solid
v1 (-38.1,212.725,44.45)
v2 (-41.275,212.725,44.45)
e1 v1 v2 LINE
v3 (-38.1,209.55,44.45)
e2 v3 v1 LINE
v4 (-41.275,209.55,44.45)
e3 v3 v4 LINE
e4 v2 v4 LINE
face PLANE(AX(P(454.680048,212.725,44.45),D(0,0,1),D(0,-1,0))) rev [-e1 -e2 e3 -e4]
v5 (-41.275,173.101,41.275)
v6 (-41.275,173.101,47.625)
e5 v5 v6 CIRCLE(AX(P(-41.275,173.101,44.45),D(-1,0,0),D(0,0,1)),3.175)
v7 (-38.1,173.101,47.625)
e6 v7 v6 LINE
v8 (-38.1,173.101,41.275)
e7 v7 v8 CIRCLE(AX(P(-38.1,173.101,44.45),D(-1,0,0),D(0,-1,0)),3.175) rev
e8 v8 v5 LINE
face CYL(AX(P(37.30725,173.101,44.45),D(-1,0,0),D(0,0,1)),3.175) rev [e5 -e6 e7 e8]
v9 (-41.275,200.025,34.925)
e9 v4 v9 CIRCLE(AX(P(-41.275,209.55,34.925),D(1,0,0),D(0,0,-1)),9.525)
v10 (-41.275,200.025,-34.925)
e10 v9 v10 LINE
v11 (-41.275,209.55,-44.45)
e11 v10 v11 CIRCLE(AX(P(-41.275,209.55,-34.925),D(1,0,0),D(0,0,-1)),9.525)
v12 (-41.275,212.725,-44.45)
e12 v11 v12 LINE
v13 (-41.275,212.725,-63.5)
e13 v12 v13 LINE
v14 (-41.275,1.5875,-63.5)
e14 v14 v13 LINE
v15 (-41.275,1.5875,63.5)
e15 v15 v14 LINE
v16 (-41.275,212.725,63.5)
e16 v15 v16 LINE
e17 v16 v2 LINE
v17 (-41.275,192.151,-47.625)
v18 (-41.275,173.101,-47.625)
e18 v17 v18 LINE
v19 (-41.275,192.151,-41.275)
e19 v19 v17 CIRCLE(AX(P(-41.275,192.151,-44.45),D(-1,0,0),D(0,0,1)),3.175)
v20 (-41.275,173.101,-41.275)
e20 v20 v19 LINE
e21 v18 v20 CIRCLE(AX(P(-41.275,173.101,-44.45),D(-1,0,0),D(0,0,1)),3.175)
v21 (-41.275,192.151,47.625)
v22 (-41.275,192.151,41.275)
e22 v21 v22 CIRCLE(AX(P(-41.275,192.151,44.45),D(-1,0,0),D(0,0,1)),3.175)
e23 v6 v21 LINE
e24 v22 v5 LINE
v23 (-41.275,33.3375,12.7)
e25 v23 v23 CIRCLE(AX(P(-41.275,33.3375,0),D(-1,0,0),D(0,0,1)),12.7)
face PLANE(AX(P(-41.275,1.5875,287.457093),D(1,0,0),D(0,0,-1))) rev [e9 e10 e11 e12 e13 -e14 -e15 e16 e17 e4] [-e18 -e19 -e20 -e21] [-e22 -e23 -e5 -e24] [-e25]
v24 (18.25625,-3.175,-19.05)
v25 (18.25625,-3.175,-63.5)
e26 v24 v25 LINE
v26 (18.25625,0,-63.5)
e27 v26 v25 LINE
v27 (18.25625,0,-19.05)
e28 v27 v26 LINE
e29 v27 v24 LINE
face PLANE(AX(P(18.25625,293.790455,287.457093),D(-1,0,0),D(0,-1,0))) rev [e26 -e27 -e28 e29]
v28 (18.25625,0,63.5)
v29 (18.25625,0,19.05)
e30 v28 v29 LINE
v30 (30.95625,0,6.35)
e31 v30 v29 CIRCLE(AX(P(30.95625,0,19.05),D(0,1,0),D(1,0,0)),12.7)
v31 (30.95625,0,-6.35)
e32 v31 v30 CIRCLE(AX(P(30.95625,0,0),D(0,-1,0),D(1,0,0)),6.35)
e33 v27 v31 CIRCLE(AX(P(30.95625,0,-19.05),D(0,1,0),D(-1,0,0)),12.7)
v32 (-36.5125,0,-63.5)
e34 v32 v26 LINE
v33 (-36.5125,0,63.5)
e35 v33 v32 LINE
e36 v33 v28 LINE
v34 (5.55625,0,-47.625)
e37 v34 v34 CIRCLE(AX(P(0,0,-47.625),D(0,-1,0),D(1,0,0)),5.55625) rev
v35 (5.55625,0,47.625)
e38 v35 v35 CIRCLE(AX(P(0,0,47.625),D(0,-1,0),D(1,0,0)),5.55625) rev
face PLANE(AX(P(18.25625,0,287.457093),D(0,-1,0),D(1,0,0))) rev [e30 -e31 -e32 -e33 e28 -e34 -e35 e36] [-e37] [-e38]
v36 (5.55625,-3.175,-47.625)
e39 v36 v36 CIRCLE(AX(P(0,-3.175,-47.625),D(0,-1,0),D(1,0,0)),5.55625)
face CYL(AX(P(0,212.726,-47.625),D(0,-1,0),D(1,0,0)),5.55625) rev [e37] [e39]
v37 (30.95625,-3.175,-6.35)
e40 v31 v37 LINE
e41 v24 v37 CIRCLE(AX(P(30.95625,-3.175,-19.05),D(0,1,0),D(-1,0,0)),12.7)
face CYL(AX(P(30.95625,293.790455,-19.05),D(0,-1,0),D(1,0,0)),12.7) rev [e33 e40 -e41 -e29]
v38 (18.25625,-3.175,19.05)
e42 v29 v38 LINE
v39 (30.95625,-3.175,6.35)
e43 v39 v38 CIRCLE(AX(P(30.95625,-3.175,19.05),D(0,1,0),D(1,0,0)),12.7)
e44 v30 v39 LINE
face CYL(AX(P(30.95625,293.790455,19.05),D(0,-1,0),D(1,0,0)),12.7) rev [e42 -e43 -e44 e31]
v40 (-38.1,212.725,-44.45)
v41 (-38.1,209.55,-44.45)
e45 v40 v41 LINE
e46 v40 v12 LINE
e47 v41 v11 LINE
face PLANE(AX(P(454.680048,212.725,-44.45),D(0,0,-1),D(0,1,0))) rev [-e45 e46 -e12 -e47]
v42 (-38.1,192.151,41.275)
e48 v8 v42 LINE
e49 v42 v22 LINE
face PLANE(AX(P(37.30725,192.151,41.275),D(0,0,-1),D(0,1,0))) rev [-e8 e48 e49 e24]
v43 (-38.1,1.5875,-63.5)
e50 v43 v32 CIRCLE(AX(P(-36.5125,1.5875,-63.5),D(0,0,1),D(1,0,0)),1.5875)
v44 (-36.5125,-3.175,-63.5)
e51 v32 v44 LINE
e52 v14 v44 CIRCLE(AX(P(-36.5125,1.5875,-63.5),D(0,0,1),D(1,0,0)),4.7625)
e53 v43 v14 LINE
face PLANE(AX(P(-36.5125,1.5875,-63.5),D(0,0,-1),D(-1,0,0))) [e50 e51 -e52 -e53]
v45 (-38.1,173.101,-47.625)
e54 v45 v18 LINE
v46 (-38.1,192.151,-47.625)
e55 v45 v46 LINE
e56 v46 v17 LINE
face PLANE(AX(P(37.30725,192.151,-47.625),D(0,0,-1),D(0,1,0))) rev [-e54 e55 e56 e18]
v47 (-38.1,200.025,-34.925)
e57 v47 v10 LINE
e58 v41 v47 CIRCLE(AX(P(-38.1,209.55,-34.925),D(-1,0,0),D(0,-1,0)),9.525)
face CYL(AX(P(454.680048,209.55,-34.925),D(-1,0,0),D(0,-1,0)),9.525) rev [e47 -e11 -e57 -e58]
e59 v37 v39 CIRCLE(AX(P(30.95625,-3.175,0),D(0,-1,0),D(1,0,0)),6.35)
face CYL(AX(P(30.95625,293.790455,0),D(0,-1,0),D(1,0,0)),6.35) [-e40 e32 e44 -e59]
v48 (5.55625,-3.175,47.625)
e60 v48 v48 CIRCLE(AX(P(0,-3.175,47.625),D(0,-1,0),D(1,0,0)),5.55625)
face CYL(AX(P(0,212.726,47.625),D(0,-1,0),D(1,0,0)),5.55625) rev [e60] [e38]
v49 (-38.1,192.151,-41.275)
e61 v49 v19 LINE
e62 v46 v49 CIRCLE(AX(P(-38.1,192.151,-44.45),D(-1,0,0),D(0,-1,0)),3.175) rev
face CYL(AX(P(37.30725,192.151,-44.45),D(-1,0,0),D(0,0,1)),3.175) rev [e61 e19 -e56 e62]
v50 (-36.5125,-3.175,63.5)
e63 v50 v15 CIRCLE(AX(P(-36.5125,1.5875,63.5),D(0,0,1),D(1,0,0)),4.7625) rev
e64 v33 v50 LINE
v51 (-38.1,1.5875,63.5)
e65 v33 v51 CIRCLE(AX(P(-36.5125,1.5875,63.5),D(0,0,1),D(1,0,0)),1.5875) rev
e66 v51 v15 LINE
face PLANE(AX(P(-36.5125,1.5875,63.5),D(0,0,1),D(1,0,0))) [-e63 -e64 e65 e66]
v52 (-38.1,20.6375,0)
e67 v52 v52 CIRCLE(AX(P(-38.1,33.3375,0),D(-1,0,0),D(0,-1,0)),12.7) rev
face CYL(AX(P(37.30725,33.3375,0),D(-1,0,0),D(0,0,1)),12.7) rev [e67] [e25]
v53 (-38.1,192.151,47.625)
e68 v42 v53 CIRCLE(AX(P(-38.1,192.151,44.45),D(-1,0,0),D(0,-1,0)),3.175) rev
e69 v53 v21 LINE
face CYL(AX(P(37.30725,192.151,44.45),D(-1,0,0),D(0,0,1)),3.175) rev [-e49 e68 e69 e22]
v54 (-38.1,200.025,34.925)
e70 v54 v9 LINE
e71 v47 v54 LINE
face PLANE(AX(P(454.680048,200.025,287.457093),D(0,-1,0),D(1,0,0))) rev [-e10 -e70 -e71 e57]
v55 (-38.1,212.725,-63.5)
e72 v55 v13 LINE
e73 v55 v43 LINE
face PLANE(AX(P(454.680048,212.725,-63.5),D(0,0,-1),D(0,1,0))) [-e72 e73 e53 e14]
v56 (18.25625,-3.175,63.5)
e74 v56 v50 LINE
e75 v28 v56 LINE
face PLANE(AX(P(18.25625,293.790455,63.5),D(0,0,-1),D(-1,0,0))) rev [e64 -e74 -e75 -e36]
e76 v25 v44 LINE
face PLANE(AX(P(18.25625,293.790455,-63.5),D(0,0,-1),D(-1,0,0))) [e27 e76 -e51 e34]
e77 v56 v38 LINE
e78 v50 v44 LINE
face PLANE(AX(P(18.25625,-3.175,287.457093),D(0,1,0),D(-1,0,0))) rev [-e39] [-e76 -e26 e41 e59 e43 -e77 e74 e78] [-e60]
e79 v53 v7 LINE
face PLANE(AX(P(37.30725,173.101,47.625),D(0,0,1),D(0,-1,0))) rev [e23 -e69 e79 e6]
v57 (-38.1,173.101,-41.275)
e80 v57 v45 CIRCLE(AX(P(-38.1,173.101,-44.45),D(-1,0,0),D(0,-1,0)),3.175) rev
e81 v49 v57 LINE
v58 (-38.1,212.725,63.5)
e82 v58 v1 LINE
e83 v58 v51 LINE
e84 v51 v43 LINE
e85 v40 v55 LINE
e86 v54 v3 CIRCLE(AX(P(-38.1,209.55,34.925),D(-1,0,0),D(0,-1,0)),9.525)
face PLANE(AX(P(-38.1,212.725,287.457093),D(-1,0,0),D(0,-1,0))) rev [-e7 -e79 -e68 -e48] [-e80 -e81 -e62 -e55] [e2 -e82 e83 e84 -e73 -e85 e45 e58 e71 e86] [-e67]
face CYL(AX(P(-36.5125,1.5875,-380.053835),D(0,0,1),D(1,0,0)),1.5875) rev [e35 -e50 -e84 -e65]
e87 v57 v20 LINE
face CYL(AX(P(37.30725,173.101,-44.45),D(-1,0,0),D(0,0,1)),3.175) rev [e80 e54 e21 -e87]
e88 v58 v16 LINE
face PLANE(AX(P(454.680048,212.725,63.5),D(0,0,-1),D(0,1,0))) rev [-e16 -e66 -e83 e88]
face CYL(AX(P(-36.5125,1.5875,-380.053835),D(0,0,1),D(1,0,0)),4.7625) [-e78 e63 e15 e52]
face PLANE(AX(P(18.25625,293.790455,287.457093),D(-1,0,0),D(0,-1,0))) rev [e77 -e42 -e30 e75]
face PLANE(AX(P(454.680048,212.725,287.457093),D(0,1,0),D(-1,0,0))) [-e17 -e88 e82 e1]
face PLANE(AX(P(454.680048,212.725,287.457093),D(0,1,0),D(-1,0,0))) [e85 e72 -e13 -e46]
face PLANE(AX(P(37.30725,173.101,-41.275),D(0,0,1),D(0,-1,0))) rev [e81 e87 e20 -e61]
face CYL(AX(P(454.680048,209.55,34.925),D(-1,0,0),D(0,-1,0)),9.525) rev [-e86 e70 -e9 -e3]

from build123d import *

# Parameters (mm, degrees)
EXTRUDE1_DEPTH             = 63.5
EXTRUDE1_DEPTH_BACK        = 63.5
CUT_EXTRUDE2_REACH         = 230.798
SKETCH2_R                  = 5.55625
EXTRUDE2_DEPTH             = 3.175
CUT_EXTRUDE3_REACH         = 237.498
SKETCH4_R                  = 12.7
CUT_EXTRUDE4_DEPTH         = 236.497746224
FILLET1_R                  = 9.525
CUT_EXTRUDE7_REACH         = 237.498
FLATTEN_BENDS1_OUTLINE_W   = 4.987278338
FLATTEN_BENDS1_OUTLINE_H   = 127
FLATTEN_BENDS1_DEPTH       = 212.725
FLATTEN_BENDS1_START       = -3.175
FLATTEN_BENDS1_2_OUTLINE_R = 12.7
FLATTEN_BENDS1_2_DEPTH     = 3.175
PROCESS_BENDS1_START       = -252.637278338
PROCESS_BENDS1_OUTLINE_W   = 3.175
PROCESS_BENDS1_OUTLINE_H   = 127
PROCESS_BENDS1_DEPTH       = 211.622562692
PROCESS_BENDS1_START_2     = -41.275
PROCESS_BENDS1_2_OUTLINE_W = 3.175
PROCESS_BENDS1_2_OUTLINE_H = 6.35
PROCESS_BENDS1_2_DEPTH     = 0.287614639
PROCESS_BENDS1_START_3     = -40.987385361
PROCESS_BENDS1_3_OUTLINE_R = 12.7
PROCESS_BENDS1_3_DEPTH     = 2.887385361
PROCESS_BENDS1_4_OUTLINE_R = 12.7
PROCESS_BENDS1_4_DEPTH     = 4.7625
PROCESS_BENDS1_START_4     = -64
PROCESS_BENDS1_5_DEPTH     = 128
PROCESS_BENDS1_START_5     = -47.625
PROCESS_BENDS1_6_DEPTH     = 95.25


with BuildPart() as part:
    # Sketch1 → Extrude1 (new, two sides: drawn at the far end of the back side and taken through both)
    with BuildSketch(Plane.XY.offset(-EXTRUDE1_DEPTH_BACK)):
        with BuildLine():
            Line((18.25625, 0), (-36.5125, 0))
            ThreePointArc((-36.5125, 0), (-37.635032015, 0.464967985), (-38.1, 1.5875))
            Line((-38.1, 1.5875), (-38.1, 212.725))
            Line((-38.1, 212.725), (-41.275, 212.725))
            Line((-41.275, 212.725), (-41.275, 1.5875))
            ThreePointArc((-41.275, 1.5875), (-39.880096045, -1.780096045), (-36.5125, -3.175))
            Line((-36.5125, -3.175), (18.25625, -3.175))
            Line((18.25625, -3.175), (18.25625, 0))
        make_face()
    extrude(amount=EXTRUDE1_DEPTH + EXTRUDE1_DEPTH_BACK)

    # Sketch2 → Cut-Extrude2 (cut, up to next)
    with BuildSketch(Plane.XZ.offset(3.175), mode=Mode.PRIVATE) as cut_extrude2_sk1:
        with Locations((0, -47.625)):
            Circle(SKETCH2_R)
    cut_extrude2_tool1 = extrude(cut_extrude2_sk1.sketch, amount=-CUT_EXTRUDE2_REACH, mode=Mode.PRIVATE) & part.part
    # Sketch2 → Cut-Extrude2 (cut, up to next)
    with BuildSketch(Plane.XZ.offset(3.175), mode=Mode.PRIVATE) as cut_extrude2_sk2:
        with Locations((0, 47.625)):
            Circle(SKETCH2_R)
    cut_extrude2_tool2 = extrude(cut_extrude2_sk2.sketch, amount=-CUT_EXTRUDE2_REACH, mode=Mode.PRIVATE) & part.part
    add(cut_extrude2_tool1.solids().sort_by_distance((0, -3.175, -47.625))[0], mode=Mode.SUBTRACT)
    add(cut_extrude2_tool2.solids().sort_by_distance((0, -3.175, 47.625))[0], mode=Mode.SUBTRACT)

    # Sketch3 → Extrude2 (add)
    with BuildSketch(Plane.XZ.offset(3.175)):
        with BuildLine():
            Line((18.25625, -19.05), (18.25625, 19.05))
            ThreePointArc((18.25625, 19.05), (21.975993879, 10.069743879), (30.95625, 6.35))
            ThreePointArc((30.95625, 6.35), (37.30625, 0), (30.95625, -6.35))
            ThreePointArc((30.95625, -6.35), (21.975993879, -10.069743879), (18.25625, -19.05))
        make_face()
    extrude(amount=-EXTRUDE2_DEPTH)

    # Sketch4 → Cut-Extrude3 (cut, up to next)
    with BuildSketch(Plane.ZY.offset(41.275), mode=Mode.PRIVATE) as cut_extrude3_sk1:
        with Locations((0, 33.3375)):
            Circle(SKETCH4_R)
    cut_extrude3_tool1 = extrude(cut_extrude3_sk1.sketch, amount=-CUT_EXTRUDE3_REACH, mode=Mode.PRIVATE) & part.part
    add(cut_extrude3_tool1.solids().sort_by_distance((-41.275, 33.3375, 0))[0], mode=Mode.SUBTRACT)

    # Sketch5 → Cut-Extrude4 (cut, through all)
    with BuildSketch(Plane.ZY.offset(41.275)):
        Polygon((44.45, 705.492076342), (44.45, 212.725), (44.45, 200.025), (-44.45, 200.025), (-44.45, 212.725), (-44.45, 705.492076342), (-44.45, 1691.026229027), (44.45, 1691.026229027), align=None)
    extrude(amount=-CUT_EXTRUDE4_DEPTH, mode=Mode.SUBTRACT)

    # Fillet1
    fillet1_edges = [part.edges().sort_by_distance(p)[0] for p in [
        (-39.6875, 200.025, 44.45),
        (-39.6875, 200.025, -44.45),
    ]]
    fillet(fillet1_edges, radius=FILLET1_R)

    # Sketch6 → Cut-Extrude7 (cut, up to next)
    with BuildSketch(Plane.ZY.offset(41.275), mode=Mode.PRIVATE) as cut_extrude7_sk1:
        with BuildLine():
            Line((-47.625, 192.151), (-47.625, 173.101))
            ThreePointArc((-47.625, 173.101), (-44.45, 169.926), (-41.275, 173.101))
            Line((-41.275, 173.101), (-41.275, 192.151))
            ThreePointArc((-41.275, 192.151), (-44.45, 195.326), (-47.625, 192.151))
        make_face()
    cut_extrude7_tool1 = extrude(cut_extrude7_sk1.sketch, amount=-CUT_EXTRUDE7_REACH, mode=Mode.PRIVATE) & part.part
    # Sketch6 → Cut-Extrude7 (cut, up to next)
    with BuildSketch(Plane.ZY.offset(41.275), mode=Mode.PRIVATE) as cut_extrude7_sk2:
        with BuildLine():
            Line((47.625, 173.101), (47.625, 192.151))
            ThreePointArc((47.625, 192.151), (44.45, 195.326), (41.275, 192.151))
            Line((41.275, 192.151), (41.275, 173.101))
            ThreePointArc((41.275, 173.101), (44.45, 169.926), (47.625, 173.101))
        make_face()
    cut_extrude7_tool2 = extrude(cut_extrude7_sk2.sketch, amount=-CUT_EXTRUDE7_REACH, mode=Mode.PRIVATE) & part.part
    add(cut_extrude7_tool1.solids().sort_by_distance((-41.275, 182.626, -44.45))[0], mode=Mode.SUBTRACT)
    add(cut_extrude7_tool2.solids().sort_by_distance((-41.275, 182.626, 44.45))[0], mode=Mode.SUBTRACT)

    # Flatten-Bends1: read off the stored shape, not the designer's step
    # Flatten-Bends1 outline → Flatten-Bends1 (cut)
    with BuildSketch(Plane(origin=(0, 0, 0), x_dir=(1, 0, 0), z_dir=(0, 1, 0))):
        with Locations((-39.006139169, 0)):
            Rectangle(FLATTEN_BENDS1_OUTLINE_W, FLATTEN_BENDS1_OUTLINE_H)
    extrude(amount=FLATTEN_BENDS1_DEPTH, mode=Mode.SUBTRACT)

    # Flatten-Bends1 2 outline → Flatten-Bends1 2 (add)
    with BuildSketch(Plane(origin=(0, 0, 0), x_dir=(1, 0, 0), z_dir=(0, 1, 0)).offset(FLATTEN_BENDS1_START)):
        with BuildLine():
            Line((-252.637278338, -44.45), (-252.637278338, -63.5))
            Line((-252.637278338, -63.5), (-36.5125, -63.5))
            Line((-36.5125, -63.5), (-36.5125, 63.5))
            Line((-36.5125, 63.5), (-252.637278338, 63.5))
            Line((-252.637278338, 63.5), (-252.637278338, 44.45))
            Line((-252.637278338, 44.45), (-249.462278338, 44.45))
            ThreePointArc((-249.462278338, 44.45), (-242.727086247, 41.660192091), (-239.937278338, 34.925))
            Line((-239.937278338, 34.925), (-239.937278338, -34.925))
            ThreePointArc((-239.937278338, -34.925), (-242.727086247, -41.660192091), (-249.462278338, -44.45))
            Line((-249.462278338, -44.45), (-252.637278338, -44.45))
        make_face()
        with BuildLine():
            Line((-213.013278338, -47.625), (-232.063278338, -47.625))
            ThreePointArc((-232.063278338, -47.625), (-235.238278338, -44.45), (-232.063278338, -41.275))
            Line((-232.063278338, -41.275), (-213.013278338, -41.275))
            ThreePointArc((-213.013278338, -41.275), (-209.838278338, -44.45), (-213.013278338, -47.625))
        make_face(mode=Mode.SUBTRACT)
        with Locations((-73.249778338, 0)):
            Circle(FLATTEN_BENDS1_2_OUTLINE_R, mode=Mode.SUBTRACT)
        with BuildLine():
            Line((-232.063278338, 47.625), (-213.013278338, 47.625))
            ThreePointArc((-213.013278338, 47.625), (-209.838278338, 44.45), (-213.013278338, 41.275))
            Line((-213.013278338, 41.275), (-232.063278338, 41.275))
            ThreePointArc((-232.063278338, 41.275), (-235.238278338, 44.45), (-232.063278338, 47.625))
        make_face(mode=Mode.SUBTRACT)
    extrude(amount=FLATTEN_BENDS1_2_DEPTH)

    # Process-Bends1: read off the stored shape, not the designer's step
    # Process-Bends1 outline → Process-Bends1 (cut)
    with BuildSketch(Plane.YZ.offset(PROCESS_BENDS1_START)):
        with Locations((-1.5875, 0)):
            Rectangle(PROCESS_BENDS1_OUTLINE_W, PROCESS_BENDS1_OUTLINE_H)
    extrude(amount=PROCESS_BENDS1_DEPTH, mode=Mode.SUBTRACT)

    # Process-Bends1 2 outline → Process-Bends1 2 (cut)
    with BuildSketch(Plane.YZ.offset(PROCESS_BENDS1_START_2)):
        with Locations((-1.5875, -44.45)):
            Rectangle(PROCESS_BENDS1_2_OUTLINE_W, PROCESS_BENDS1_2_OUTLINE_H)
        with Locations((-1.5875, 44.45)):
            Rectangle(PROCESS_BENDS1_2_OUTLINE_W, PROCESS_BENDS1_2_OUTLINE_H)
    extrude(amount=PROCESS_BENDS1_2_DEPTH, mode=Mode.SUBTRACT)

    # Process-Bends1 3 outline → Process-Bends1 3 (add)
    with BuildSketch(Plane.YZ.offset(PROCESS_BENDS1_START_3)):
        with BuildLine():
            Line((212.725, -44.45), (209.55, -44.45))
            ThreePointArc((209.55, -44.45), (202.814807909, -41.660192091), (200.025, -34.925))
            Line((200.025, -34.925), (200.025, 34.925))
            ThreePointArc((200.025, 34.925), (202.814807909, 41.660192091), (209.55, 44.45))
            Line((209.55, 44.45), (212.725, 44.45))
            Line((212.725, 44.45), (212.725, 63.5))
            Line((212.725, 63.5), (0, 63.5))
            Line((0, 63.5), (0, -63.5))
            Line((0, -63.5), (212.725, -63.5))
            Line((212.725, -63.5), (212.725, -44.45))
        make_face()
        with BuildLine():
            Line((192.151, -47.625), (173.101, -47.625))
            ThreePointArc((173.101, -47.625), (169.926, -44.45), (173.101, -41.275))
            Line((173.101, -41.275), (192.151, -41.275))
            ThreePointArc((192.151, -41.275), (195.326, -44.45), (192.151, -47.625))
        make_face(mode=Mode.SUBTRACT)
        with Locations((33.3375, 0)):
            Circle(PROCESS_BENDS1_3_OUTLINE_R, mode=Mode.SUBTRACT)
        with BuildLine():
            Line((192.151, 41.275), (173.101, 41.275))
            ThreePointArc((173.101, 41.275), (169.926, 44.45), (173.101, 47.625))
            Line((173.101, 47.625), (192.151, 47.625))
            ThreePointArc((192.151, 47.625), (195.326, 44.45), (192.151, 41.275))
        make_face(mode=Mode.SUBTRACT)
    extrude(amount=PROCESS_BENDS1_3_DEPTH)

    # Process-Bends1 4 outline → Process-Bends1 4 (add)
    with BuildSketch(Plane.YZ.offset(PROCESS_BENDS1_START_2)):
        with BuildLine():
            Line((212.725, 63.5), (0, 63.5))
            Line((0, 63.5), (0, -63.5))
            Line((0, -63.5), (212.725, -63.5))
            Line((212.725, -63.5), (212.725, -44.45))
            Line((212.725, -44.45), (209.55, -44.45))
            ThreePointArc((209.55, -44.45), (202.814807909, -41.660192091), (200.025, -34.925))
            Line((200.025, -34.925), (200.025, 34.925))
            ThreePointArc((200.025, 34.925), (202.814807909, 41.660192091), (209.55, 44.45))
            Line((209.55, 44.45), (212.725, 44.45))
            Line((212.725, 44.45), (212.725, 63.5))
        make_face()
        with BuildLine():
            Line((192.151, -47.625), (173.101, -47.625))
            ThreePointArc((173.101, -47.625), (169.926, -44.45), (173.101, -41.275))
            Line((173.101, -41.275), (192.151, -41.275))
            ThreePointArc((192.151, -41.275), (195.326, -44.45), (192.151, -47.625))
        make_face(mode=Mode.SUBTRACT)
        with Locations((33.3375, 0)):
            Circle(PROCESS_BENDS1_4_OUTLINE_R, mode=Mode.SUBTRACT)
        with BuildLine():
            Line((192.151, 41.275), (173.101, 41.275))
            ThreePointArc((173.101, 41.275), (169.926, 44.45), (173.101, 47.625))
            Line((173.101, 47.625), (192.151, 47.625))
            ThreePointArc((192.151, 47.625), (195.326, 44.45), (192.151, 41.275))
        make_face(mode=Mode.SUBTRACT)
    extrude(amount=PROCESS_BENDS1_4_DEPTH)

    # Process-Bends1 5 outline → Process-Bends1 5 (cut)
    with BuildSketch(Plane.XY.offset(PROCESS_BENDS1_START_4)):
        with BuildLine():
            Line((-36.5125, 212.725), (-38.1, 212.725))
            Line((-38.1, 212.725), (-38.1, 1.5875))
            ThreePointArc((-38.1, 1.5875), (-37.635032015, 0.464967985), (-36.5125, 0))
            Line((-36.5125, 0), (-36.5125, 212.725))
        make_face()
        with BuildLine():
            Line((-41.275, 1.5875), (-41.275, 0))
            Line((-41.275, 0), (-41.014715646, 0))
            Line((-41.014715646, 0), (-41.014715646, -3.175))
            Line((-41.014715646, -3.175), (-36.5125, -3.175))
            ThreePointArc((-36.5125, -3.175), (-39.880096045, -1.780096045), (-41.275, 1.5875))
        make_face()
    extrude(amount=PROCESS_BENDS1_5_DEPTH, mode=Mode.SUBTRACT)

    # Process-Bends1 6 outline → Process-Bends1 6 (add)
    with BuildSketch(Plane.XY.offset(PROCESS_BENDS1_START_5)):
        with BuildLine():
            Line((-40.987385361, 0), (-41.00262806, 0))
            ThreePointArc((-41.00262806, 0), (-40.995057012, -0.021253828), (-40.987385361, -0.04247155))
            Line((-40.987385361, -0.04247155), (-40.987385361, 0))
        make_face()
    extrude(amount=PROCESS_BENDS1_6_DEPTH)


solid = part.part
